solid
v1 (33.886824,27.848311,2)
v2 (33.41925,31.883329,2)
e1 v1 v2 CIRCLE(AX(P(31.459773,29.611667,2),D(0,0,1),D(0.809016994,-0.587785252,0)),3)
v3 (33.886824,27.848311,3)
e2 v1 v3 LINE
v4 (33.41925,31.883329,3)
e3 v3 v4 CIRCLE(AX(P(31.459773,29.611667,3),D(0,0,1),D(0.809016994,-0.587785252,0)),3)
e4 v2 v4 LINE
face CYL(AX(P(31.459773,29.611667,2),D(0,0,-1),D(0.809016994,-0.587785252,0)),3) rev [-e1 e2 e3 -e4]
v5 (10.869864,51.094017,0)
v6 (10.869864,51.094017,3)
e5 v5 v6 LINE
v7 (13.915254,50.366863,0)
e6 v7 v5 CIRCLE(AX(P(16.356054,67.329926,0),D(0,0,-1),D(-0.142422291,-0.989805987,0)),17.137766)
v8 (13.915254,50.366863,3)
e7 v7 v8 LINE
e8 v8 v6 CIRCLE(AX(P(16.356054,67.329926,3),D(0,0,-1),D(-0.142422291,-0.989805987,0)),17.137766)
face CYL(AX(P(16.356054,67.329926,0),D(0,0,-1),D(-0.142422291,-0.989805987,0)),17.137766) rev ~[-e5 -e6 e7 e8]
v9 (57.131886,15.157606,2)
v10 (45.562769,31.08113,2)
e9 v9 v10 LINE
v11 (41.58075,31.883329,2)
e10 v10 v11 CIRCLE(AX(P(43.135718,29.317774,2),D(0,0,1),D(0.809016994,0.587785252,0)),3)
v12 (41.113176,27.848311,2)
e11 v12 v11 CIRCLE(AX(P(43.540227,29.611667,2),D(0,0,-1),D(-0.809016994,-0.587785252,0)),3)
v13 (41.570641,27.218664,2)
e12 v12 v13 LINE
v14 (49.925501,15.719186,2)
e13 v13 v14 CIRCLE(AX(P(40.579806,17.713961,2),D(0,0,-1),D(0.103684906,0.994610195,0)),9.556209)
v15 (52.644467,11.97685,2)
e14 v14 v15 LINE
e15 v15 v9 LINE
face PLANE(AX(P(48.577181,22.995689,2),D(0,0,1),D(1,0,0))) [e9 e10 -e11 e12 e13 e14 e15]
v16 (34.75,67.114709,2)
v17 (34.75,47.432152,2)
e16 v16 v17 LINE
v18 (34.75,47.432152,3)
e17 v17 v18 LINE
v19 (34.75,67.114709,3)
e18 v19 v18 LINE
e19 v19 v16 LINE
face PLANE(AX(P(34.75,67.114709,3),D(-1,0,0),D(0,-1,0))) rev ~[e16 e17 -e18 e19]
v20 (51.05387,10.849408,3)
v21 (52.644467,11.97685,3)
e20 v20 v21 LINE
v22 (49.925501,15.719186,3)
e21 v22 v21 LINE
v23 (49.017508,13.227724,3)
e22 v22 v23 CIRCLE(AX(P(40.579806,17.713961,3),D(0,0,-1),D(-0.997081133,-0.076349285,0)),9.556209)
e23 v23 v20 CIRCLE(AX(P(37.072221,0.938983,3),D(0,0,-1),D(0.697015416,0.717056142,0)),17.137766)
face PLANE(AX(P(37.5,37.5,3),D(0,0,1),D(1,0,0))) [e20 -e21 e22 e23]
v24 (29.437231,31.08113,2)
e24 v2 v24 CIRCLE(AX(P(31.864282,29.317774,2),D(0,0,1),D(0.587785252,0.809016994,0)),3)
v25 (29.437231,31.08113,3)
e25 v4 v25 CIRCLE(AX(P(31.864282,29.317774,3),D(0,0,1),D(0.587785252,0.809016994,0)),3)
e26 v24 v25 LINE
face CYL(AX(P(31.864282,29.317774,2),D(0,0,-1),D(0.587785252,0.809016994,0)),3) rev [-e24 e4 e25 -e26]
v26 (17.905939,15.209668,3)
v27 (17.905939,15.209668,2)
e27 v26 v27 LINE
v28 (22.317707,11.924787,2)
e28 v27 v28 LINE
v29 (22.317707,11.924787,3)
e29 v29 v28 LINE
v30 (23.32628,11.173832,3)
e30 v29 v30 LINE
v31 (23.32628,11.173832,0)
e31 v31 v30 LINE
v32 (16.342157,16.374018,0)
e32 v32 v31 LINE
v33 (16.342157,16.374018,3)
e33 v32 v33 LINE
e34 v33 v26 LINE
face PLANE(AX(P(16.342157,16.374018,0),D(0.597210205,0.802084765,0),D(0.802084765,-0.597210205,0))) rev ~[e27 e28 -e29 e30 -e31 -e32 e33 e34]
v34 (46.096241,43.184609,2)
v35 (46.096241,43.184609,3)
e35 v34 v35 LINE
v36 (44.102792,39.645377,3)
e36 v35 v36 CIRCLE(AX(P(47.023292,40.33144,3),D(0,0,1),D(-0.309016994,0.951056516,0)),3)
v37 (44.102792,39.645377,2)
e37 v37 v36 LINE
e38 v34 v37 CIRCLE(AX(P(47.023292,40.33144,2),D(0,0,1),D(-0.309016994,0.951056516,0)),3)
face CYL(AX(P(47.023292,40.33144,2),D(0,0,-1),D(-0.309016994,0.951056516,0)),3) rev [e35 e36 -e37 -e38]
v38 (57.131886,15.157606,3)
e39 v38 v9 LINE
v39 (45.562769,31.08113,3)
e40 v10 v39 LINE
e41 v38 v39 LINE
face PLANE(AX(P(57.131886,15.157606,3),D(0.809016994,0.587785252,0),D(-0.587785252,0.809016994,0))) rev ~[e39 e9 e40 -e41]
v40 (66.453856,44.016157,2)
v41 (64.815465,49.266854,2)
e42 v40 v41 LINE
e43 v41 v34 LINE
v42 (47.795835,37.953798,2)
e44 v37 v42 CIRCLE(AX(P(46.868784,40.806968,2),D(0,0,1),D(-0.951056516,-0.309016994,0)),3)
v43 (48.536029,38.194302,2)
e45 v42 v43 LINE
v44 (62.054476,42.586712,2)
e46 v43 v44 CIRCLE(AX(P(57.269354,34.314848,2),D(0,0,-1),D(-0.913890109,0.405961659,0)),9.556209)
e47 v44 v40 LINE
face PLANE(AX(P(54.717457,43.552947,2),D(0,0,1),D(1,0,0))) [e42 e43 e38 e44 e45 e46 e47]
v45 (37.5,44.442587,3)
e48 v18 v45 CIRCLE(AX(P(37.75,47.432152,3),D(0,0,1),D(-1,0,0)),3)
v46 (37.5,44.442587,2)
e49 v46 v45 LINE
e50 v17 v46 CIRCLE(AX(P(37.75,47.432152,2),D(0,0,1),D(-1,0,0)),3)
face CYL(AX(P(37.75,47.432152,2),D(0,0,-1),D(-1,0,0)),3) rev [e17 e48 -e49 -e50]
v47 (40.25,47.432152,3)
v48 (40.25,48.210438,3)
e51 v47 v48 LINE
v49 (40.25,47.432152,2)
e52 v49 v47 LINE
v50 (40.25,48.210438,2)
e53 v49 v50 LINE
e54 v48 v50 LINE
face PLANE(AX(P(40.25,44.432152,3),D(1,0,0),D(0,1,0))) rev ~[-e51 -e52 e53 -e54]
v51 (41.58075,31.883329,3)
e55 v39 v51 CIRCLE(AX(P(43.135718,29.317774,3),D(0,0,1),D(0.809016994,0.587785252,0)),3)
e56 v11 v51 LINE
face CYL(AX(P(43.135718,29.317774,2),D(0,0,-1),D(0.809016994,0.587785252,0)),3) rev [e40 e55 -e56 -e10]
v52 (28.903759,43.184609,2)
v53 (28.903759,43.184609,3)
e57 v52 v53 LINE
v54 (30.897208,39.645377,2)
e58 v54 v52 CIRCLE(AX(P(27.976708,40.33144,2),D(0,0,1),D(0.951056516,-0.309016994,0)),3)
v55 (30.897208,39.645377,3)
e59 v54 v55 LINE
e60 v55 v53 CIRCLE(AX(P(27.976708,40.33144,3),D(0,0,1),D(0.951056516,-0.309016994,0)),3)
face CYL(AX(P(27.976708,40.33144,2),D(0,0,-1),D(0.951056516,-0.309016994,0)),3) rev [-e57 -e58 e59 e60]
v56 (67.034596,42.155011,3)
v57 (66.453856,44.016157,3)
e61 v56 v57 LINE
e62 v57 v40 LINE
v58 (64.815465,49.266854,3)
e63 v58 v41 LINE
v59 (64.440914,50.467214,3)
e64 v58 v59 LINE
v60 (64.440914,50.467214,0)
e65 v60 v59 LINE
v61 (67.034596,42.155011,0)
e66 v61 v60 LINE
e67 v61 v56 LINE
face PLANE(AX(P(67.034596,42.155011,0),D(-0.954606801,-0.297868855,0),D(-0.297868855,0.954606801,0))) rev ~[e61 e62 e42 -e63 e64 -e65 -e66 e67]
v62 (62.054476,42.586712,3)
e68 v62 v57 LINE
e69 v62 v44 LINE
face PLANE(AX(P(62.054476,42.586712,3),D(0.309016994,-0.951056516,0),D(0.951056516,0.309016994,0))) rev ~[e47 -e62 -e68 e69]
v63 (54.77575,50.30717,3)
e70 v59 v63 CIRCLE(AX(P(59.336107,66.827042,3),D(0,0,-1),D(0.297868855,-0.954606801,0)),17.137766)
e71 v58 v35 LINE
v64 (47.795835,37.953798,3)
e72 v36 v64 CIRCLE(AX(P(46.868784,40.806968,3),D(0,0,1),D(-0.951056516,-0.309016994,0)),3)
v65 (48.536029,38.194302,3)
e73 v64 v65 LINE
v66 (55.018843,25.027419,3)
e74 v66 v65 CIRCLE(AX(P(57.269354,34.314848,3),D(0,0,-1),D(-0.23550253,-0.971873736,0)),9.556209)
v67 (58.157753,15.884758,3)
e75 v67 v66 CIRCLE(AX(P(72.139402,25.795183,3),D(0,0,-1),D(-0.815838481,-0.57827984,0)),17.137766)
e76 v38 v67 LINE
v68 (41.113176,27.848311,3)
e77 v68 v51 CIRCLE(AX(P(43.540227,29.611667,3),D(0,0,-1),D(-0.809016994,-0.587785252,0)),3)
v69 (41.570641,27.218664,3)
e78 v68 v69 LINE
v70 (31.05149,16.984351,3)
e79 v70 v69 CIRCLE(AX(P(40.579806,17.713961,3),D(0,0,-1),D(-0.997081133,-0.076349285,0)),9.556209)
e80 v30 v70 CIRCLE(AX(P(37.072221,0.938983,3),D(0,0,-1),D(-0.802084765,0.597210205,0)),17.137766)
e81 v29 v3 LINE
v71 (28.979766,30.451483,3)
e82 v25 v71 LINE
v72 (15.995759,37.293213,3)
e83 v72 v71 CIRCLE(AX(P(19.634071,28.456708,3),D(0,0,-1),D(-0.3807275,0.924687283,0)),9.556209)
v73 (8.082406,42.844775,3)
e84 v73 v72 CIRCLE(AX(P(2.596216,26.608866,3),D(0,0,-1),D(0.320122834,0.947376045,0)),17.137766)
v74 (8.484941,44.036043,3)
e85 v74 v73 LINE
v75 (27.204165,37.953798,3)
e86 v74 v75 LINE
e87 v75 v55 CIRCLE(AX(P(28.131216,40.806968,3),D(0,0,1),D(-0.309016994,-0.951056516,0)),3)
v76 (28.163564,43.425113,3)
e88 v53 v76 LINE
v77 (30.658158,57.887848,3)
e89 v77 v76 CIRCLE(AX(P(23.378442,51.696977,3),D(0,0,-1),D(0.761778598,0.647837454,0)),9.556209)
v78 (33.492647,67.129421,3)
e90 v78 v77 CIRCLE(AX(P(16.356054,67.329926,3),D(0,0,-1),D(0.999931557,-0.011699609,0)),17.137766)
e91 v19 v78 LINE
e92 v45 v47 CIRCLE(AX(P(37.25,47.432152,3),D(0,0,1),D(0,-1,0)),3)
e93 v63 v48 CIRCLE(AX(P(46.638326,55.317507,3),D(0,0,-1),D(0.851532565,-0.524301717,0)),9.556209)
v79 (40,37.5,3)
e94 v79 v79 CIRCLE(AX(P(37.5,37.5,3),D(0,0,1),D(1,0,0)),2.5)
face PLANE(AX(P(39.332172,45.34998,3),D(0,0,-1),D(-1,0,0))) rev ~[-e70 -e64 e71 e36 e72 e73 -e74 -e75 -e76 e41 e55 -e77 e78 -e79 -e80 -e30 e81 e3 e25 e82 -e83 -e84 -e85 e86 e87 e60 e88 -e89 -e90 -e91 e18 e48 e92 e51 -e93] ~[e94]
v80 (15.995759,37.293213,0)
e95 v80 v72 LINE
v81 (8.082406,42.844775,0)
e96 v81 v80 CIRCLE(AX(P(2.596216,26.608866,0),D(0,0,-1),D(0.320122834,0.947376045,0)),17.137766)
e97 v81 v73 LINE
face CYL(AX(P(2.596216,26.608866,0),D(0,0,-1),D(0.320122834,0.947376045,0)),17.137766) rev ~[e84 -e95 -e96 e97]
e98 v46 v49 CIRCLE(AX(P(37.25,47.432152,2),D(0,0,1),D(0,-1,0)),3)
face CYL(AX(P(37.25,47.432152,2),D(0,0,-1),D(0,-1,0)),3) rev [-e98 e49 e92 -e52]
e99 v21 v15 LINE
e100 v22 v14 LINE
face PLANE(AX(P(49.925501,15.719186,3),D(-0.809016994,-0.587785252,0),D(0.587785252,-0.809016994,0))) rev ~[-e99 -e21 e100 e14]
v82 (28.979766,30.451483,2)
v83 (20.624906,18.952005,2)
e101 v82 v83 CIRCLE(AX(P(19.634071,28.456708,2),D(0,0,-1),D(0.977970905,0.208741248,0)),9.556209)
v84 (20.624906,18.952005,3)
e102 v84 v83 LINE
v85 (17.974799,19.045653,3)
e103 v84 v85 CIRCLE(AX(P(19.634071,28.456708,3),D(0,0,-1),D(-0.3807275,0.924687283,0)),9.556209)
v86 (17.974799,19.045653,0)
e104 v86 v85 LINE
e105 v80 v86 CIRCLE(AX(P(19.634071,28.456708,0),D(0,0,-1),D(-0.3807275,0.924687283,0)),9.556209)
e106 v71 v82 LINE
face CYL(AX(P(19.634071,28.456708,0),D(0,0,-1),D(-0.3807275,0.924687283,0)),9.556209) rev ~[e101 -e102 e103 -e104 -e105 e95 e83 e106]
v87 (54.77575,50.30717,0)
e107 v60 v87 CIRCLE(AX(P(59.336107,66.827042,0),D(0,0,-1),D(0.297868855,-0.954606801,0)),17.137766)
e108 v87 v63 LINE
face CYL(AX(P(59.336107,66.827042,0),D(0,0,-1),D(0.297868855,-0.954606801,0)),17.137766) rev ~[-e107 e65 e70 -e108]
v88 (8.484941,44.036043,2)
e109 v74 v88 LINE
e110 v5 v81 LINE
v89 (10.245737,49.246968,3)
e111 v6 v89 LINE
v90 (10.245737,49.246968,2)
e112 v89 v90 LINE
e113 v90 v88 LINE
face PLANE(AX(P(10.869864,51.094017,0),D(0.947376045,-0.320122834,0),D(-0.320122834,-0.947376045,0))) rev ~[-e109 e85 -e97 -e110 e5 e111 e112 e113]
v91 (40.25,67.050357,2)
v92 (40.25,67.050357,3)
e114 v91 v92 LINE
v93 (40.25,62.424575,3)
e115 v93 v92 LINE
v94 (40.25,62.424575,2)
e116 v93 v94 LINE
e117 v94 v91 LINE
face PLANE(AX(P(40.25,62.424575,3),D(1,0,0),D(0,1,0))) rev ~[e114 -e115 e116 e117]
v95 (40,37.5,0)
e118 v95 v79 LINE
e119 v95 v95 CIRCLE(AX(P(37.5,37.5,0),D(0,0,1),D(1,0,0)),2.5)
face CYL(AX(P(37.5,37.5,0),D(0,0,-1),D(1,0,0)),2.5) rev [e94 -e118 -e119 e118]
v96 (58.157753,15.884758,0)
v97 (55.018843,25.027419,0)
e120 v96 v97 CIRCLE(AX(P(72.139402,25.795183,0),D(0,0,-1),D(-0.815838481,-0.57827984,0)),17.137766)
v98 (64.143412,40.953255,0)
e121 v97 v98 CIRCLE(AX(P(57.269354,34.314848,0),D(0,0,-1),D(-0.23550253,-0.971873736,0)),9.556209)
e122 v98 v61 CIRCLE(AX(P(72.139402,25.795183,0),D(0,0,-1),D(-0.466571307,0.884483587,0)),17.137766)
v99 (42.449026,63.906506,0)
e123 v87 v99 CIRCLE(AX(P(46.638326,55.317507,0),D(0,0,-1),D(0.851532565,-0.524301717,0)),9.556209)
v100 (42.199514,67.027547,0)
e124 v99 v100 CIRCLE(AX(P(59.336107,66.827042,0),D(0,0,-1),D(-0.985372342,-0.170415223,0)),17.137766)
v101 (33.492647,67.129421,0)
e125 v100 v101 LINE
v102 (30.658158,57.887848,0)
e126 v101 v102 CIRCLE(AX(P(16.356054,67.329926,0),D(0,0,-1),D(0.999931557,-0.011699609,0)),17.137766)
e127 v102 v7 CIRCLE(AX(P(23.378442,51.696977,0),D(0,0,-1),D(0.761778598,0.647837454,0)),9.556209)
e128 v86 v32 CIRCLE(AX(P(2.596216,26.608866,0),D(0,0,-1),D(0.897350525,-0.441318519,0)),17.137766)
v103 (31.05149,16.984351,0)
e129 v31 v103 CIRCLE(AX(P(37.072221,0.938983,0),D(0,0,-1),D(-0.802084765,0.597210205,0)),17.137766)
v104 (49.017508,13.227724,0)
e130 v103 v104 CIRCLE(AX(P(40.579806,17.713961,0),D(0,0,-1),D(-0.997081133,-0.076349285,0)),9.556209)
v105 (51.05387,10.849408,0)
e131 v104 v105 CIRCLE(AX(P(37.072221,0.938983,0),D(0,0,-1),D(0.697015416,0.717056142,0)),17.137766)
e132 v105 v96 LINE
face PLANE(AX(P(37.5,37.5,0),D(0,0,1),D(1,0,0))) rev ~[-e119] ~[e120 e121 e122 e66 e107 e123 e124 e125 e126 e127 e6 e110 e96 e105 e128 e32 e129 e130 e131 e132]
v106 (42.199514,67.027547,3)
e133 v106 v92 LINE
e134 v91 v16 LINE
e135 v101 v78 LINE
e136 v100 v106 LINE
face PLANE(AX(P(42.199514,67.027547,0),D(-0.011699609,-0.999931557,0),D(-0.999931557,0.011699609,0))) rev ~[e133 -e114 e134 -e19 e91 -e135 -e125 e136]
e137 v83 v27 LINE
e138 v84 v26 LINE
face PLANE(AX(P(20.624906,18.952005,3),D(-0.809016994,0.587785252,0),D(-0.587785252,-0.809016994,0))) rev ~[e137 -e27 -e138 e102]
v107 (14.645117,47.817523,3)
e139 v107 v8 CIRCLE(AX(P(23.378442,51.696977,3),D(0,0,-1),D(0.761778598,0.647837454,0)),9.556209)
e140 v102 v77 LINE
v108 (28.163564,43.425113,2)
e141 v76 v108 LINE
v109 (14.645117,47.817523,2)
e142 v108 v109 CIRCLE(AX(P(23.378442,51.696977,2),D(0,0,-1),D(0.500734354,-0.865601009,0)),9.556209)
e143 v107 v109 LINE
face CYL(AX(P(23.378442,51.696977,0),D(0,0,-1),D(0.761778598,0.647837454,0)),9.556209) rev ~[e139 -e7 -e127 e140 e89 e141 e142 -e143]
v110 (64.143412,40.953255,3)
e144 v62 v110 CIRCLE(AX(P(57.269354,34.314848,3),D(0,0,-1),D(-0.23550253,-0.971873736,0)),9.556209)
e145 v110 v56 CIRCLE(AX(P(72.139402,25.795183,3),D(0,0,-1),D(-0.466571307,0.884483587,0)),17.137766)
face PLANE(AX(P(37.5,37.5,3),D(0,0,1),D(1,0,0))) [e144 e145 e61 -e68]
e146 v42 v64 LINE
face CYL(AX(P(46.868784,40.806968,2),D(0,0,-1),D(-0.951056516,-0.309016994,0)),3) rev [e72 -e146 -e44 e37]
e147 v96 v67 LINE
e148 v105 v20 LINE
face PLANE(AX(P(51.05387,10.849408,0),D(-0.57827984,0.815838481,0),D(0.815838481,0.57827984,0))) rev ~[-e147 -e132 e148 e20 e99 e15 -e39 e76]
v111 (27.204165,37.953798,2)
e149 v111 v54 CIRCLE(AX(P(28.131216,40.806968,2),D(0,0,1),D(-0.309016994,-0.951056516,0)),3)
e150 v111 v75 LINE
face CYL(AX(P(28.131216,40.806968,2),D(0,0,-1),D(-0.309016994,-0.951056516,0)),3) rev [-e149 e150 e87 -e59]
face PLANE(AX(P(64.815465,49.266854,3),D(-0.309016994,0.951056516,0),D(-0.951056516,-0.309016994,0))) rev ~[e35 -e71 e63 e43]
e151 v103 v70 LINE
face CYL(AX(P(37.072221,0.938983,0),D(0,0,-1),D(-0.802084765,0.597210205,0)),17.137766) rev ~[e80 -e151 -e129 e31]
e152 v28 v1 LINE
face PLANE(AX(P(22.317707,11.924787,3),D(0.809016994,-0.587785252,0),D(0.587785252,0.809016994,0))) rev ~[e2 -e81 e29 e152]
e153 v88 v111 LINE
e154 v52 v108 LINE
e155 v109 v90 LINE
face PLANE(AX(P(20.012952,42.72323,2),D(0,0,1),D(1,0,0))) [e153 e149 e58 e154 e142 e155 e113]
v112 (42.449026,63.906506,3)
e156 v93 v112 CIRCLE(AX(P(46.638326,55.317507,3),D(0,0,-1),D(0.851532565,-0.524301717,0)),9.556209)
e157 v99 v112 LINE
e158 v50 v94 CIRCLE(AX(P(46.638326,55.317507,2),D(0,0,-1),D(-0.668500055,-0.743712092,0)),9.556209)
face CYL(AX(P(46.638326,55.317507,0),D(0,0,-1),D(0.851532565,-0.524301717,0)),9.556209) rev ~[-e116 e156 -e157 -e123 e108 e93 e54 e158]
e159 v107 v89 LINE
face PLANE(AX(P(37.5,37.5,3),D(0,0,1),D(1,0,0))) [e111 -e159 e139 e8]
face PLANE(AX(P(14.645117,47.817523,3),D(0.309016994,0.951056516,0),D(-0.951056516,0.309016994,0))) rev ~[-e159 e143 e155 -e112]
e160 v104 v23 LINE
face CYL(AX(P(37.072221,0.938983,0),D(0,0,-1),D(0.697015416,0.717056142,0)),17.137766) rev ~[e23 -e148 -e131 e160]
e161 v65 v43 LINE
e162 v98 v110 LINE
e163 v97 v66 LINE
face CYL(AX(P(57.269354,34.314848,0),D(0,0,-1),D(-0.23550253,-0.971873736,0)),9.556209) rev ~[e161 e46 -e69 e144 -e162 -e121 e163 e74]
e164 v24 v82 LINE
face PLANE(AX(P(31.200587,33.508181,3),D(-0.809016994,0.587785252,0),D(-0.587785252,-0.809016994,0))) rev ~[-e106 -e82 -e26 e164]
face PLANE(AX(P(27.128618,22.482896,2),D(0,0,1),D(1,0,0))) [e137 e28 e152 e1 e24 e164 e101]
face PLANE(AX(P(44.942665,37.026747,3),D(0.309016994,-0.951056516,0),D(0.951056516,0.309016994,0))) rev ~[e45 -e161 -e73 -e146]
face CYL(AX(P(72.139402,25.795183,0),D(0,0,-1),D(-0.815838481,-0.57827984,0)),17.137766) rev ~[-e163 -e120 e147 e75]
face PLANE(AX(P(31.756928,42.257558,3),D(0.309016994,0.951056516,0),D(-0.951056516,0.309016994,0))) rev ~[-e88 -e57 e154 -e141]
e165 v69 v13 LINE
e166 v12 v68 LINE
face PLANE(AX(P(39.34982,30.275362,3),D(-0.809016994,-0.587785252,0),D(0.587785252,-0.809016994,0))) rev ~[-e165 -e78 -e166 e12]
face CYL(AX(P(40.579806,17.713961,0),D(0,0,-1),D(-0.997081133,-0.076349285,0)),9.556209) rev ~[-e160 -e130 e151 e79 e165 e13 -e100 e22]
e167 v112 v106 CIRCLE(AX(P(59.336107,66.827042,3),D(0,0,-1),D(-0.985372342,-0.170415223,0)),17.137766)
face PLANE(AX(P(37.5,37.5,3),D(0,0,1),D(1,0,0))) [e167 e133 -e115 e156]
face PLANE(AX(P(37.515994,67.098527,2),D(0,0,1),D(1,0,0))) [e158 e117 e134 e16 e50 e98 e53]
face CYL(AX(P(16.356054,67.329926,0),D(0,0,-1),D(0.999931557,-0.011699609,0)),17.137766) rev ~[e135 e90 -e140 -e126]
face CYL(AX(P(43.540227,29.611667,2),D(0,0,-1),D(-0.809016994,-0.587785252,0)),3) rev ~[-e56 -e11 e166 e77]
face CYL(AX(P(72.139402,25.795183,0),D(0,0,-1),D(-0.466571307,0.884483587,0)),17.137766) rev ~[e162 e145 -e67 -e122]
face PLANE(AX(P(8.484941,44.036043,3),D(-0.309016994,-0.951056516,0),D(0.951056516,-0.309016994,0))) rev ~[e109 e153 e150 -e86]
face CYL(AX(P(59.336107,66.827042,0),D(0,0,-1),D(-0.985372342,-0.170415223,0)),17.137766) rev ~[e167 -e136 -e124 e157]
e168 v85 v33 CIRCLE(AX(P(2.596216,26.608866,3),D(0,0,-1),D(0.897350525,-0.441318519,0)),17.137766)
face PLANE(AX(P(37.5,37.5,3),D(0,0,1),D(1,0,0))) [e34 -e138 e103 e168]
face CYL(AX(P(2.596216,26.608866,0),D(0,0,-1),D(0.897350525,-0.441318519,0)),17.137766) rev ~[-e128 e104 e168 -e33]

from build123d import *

# Parameters (mm, degrees)
F0_R        = 2.5
F1_DEPTH    = 3
F3_DEPTH    = 1
F4_T1_DEPTH = 1


# Not quite as in the source:
# - a fillet or chamfer that OpenCascade refuses, or shapes differently, is made with other operations: its cross-section is extruded or revolved along the edge and cut away or added


with BuildPart() as f1:
    # F0 (on Top) → F1 (new body)
    with BuildSketch(Plane.XY):
        with BuildLine():
            Line((42.1995138221, 67.0275468757), (33.4926469464, 67.1294207869))
            ThreePointArc((33.4926469464, 67.1294207869), (32.7404851321, 62.3046461892), (30.658157874, 57.8878475177))
            ThreePointArc((30.658157874, 57.8878475177), (27.294204133, 42.9798709067), (13.9152540739, 50.3668626301))
            ThreePointArc((13.9152540739, 50.3668626301), (12.375918121, 50.6607466073), (10.86986377, 51.0940170307))
            Line((10.86986377, 51.0940170307), (8.0824060906, 42.844775322))
            ThreePointArc((8.0824060906, 42.844775322), (12.4386086282, 40.6384895823), (15.9957592753, 37.2932128243))
            ThreePointArc((15.9957592753, 37.2932128243), (29.1345687017, 29.4870845738), (17.9747991522, 19.0456529188))
            ThreePointArc((17.9747991522, 19.0456529188), (17.2196179112, 17.6724725733), (16.3421568627, 16.3740176929))
            Line((16.3421568627, 16.3740176929), (23.3262801503, 11.1738320243))
            ThreePointArc((23.3262801503, 11.1738320243), (26.7707231948, 14.6350470461), (31.0514904559, 16.9843509793))
            ThreePointArc((31.0514904559, 16.9843509793), (42.5356749941, 27.0678750109), (49.017508165, 13.2277236335))
            ThreePointArc((49.017508165, 13.2277236335), (50.0901164433, 12.0851675302), (51.0538700425, 10.8494078578))
            Line((51.0538700425, 10.8494078578), (58.1577532953, 15.8847580755))
            ThreePointArc((58.1577532953, 15.8847580755), (55.9303336315, 20.230192341), (55.0188426496, 25.0274187796))
            ThreePointArc((55.0188426496, 25.0274187796), (48.977649601, 39.065507608), (64.1434123595, 40.9532553024))
            ThreePointArc((64.1434123595, 40.9532553024), (65.5615019731, 41.620297142), (67.0345955027, 42.1550105429))
            Line((67.0345955027, 42.1550105429), (64.4409135174, 50.4672137913))
            ThreePointArc((64.4409135174, 50.4672137913), (59.6198494134, 49.6916248415), (54.7757497452, 50.307169899))
            ThreePointArc((54.7757497452, 50.307169899), (39.5579025703, 48.8996619005), (42.4490262494, 63.9065055152))
            ThreePointArc((42.4490262494, 63.9065055152), (42.2528455514, 65.4613161473), (42.1995138221, 67.0275468757))
        make_face()
        with Locations((37.5, 37.5)):
            Circle(F0_R, mode=Mode.SUBTRACT)
    extrude(amount=F1_DEPTH)

    # F2 (on face) → F3 (cut)
    with BuildSketch(Plane.XY.offset(3)):
        Polygon((40.25, 67.1147092408), (34.75, 67.1147092408), (40.25, 67.0503569865), align=None)
        with BuildLine():
            Line((31.7569283434, 42.2575582148), (28.1635644564, 43.4251129174))
            ThreePointArc((28.1635644564, 43.4251129174), (20.4254111601, 42.6084822131), (14.6451171229, 47.8175227185))
            Line((14.6451171229, 47.8175227185), (10.2457371637, 49.2469679185))
            Line((10.2457371637, 49.2469679185), (8.4849410638, 44.0360430191))
            Line((8.4849410638, 44.0360430191), (30.0573348743, 37.0267473751))
            Line((30.0573348743, 37.0267473751), (31.7569283434, 42.2575582148))
        make_face()
        with BuildLine():
            Line((31.2005865164, 33.5081806175), (28.9797655003, 30.4514827223))
            ThreePointArc((28.9797655003, 30.4514827223), (27.3652065793, 22.8397088401), (20.6249055731, 18.9520045705))
            Line((20.6249055731, 18.9520045705), (17.9059392288, 15.2096684519))
            Line((17.9059392288, 15.2096684519), (22.3177073919, 11.9247874969))
            Line((22.3177073919, 11.9247874969), (35.6501799855, 30.2753617299))
            Line((35.6501799855, 30.2753617299), (31.2005865164, 33.5081806175))
        make_face()
        with BuildLine():
            Line((52.6444673021, 11.9768495643), (57.1318860772, 15.1576063845))
            Line((57.1318860772, 15.1576063845), (43.7994134836, 33.5081806175))
            Line((43.7994134836, 33.5081806175), (39.3498200145, 30.2753617299))
            Line((39.3498200145, 30.2753617299), (41.5706410307, 27.2186638347))
            ThreePointArc((41.5706410307, 27.2186638347), (48.3109420369, 23.3309595651), (49.9255009579, 15.7191856828))
            Line((49.9255009579, 15.7191856828), (52.6444673021, 11.9768495643))
        make_face()
        with BuildLine():
            Line((66.4538563054, 44.0161570789), (64.8154654671, 49.2668538587))
            Line((64.8154654671, 49.2668538587), (43.2430716566, 42.2575582148))
            Line((43.2430716566, 42.2575582148), (44.9426651257, 37.0267473751))
            Line((44.9426651257, 37.0267473751), (48.5360290127, 38.1943020778))
            ThreePointArc((48.5360290127, 38.1943020778), (54.3163230499, 43.4033425831), (62.0544763461, 42.5867118789))
            Line((62.0544763461, 42.5867118789), (66.4538563054, 44.0161570789))
        make_face()
        with BuildLine():
            Line((34.75, 44.4321520627), (37.5, 44.4321520627))
            Line((37.5, 44.4321520627), (40.25, 44.4321520627))
            Line((40.25, 44.4321520627), (40.25, 48.2104384478))
            ThreePointArc((40.25, 48.2104384478), (37.0821171737, 55.3175067985), (40.25, 62.4245751493))
            Line((40.25, 62.4245751493), (40.25, 67.0503569865))
            Line((40.25, 67.0503569865), (34.75, 67.1147092408))
            Line((34.75, 67.1147092408), (34.75, 44.4321520627))
        make_face()
    extrude(amount=-F3_DEPTH, mode=Mode.SUBTRACT)

    # F4: fillet of radius 3 on 10 edges, made by hand

    # F4_s2 → F4_t1 (join)
    with BuildSketch(Plane.XY.offset(2)):
        with BuildLine():
            ThreePointArc((37.25, 44.4321520627), (39.3713203436, 45.3108317191), (40.25, 47.4321520627))
            Line((40.25, 47.4321520627), (40.25, 44.4321520627))
            Line((40.25, 44.4321520627), (37.25, 44.4321520627))
        make_face()
        with BuildLine():
            ThreePointArc((34.75, 47.4321520627), (35.6286796564, 45.3108317191), (37.75, 44.4321520627))
            Line((37.75, 44.4321520627), (34.75, 44.4321520627))
            Line((34.75, 44.4321520627), (34.75, 47.4321520627))
        make_face()
        with BuildLine():
            ThreePointArc((30.8298773603, 39.4043886659), (30.6497273839, 41.6934111482), (28.9037587945, 43.1846091979))
            Line((28.9037587945, 43.1846091979), (31.7569283434, 42.2575582148))
            Line((31.7569283434, 42.2575582148), (30.8298773603, 39.4043886659))
        make_face()
        with BuildLine():
            ThreePointArc((27.2041653254, 37.9537983583), (29.4931878078, 38.1339483346), (30.9843858575, 39.879916924))
            Line((30.9843858575, 39.879916924), (30.0573348743, 37.0267473751))
            Line((30.0573348743, 37.0267473751), (27.2041653254, 37.9537983583))
        make_face()
        with BuildLine():
            ThreePointArc((33.6276374995, 31.7448248606), (31.3949783475, 32.2808388993), (29.4372307595, 31.0811296344))
            Line((29.4372307595, 31.0811296344), (31.2005865164, 33.5081806175))
            Line((31.2005865164, 33.5081806175), (33.6276374995, 31.7448248606))
        make_face()
        with BuildLine():
            ThreePointArc((33.8868242286, 27.8483107468), (34.4228382672, 30.0809698988), (33.2231290023, 32.0387174868))
            Line((33.2231290023, 32.0387174868), (35.6501799855, 30.2753617299))
            Line((35.6501799855, 30.2753617299), (33.8868242286, 27.8483107468))
        make_face()
        with BuildLine():
            ThreePointArc((41.1131757714, 27.8483107468), (40.5771617328, 30.0809698988), (41.7768709977, 32.0387174868))
            Line((41.7768709977, 32.0387174868), (39.3498200145, 30.2753617299))
            Line((39.3498200145, 30.2753617299), (41.1131757714, 27.8483107468))
        make_face()
        with BuildLine():
            ThreePointArc((45.5627692405, 31.0811296344), (43.6050216525, 32.2808388993), (41.3723625005, 31.7448248606))
            Line((41.3723625005, 31.7448248606), (43.7994134836, 33.5081806175))
            Line((43.7994134836, 33.5081806175), (45.5627692405, 31.0811296344))
        make_face()
        with BuildLine():
            ThreePointArc((44.0156141425, 39.879916924), (45.5068121922, 38.1339483346), (47.7958346746, 37.9537983583))
            Line((47.7958346746, 37.9537983583), (44.9426651257, 37.0267473751))
            Line((44.9426651257, 37.0267473751), (44.0156141425, 39.879916924))
        make_face()
        with BuildLine():
            ThreePointArc((46.0962412055, 43.1846091979), (44.3502726161, 41.6934111482), (44.1701226397, 39.4043886659))
            Line((44.1701226397, 39.4043886659), (43.2430716566, 42.2575582148))
            Line((43.2430716566, 42.2575582148), (46.0962412055, 43.1846091979))
        make_face()
    extrude(amount=F4_T1_DEPTH)


solid = f1.part
